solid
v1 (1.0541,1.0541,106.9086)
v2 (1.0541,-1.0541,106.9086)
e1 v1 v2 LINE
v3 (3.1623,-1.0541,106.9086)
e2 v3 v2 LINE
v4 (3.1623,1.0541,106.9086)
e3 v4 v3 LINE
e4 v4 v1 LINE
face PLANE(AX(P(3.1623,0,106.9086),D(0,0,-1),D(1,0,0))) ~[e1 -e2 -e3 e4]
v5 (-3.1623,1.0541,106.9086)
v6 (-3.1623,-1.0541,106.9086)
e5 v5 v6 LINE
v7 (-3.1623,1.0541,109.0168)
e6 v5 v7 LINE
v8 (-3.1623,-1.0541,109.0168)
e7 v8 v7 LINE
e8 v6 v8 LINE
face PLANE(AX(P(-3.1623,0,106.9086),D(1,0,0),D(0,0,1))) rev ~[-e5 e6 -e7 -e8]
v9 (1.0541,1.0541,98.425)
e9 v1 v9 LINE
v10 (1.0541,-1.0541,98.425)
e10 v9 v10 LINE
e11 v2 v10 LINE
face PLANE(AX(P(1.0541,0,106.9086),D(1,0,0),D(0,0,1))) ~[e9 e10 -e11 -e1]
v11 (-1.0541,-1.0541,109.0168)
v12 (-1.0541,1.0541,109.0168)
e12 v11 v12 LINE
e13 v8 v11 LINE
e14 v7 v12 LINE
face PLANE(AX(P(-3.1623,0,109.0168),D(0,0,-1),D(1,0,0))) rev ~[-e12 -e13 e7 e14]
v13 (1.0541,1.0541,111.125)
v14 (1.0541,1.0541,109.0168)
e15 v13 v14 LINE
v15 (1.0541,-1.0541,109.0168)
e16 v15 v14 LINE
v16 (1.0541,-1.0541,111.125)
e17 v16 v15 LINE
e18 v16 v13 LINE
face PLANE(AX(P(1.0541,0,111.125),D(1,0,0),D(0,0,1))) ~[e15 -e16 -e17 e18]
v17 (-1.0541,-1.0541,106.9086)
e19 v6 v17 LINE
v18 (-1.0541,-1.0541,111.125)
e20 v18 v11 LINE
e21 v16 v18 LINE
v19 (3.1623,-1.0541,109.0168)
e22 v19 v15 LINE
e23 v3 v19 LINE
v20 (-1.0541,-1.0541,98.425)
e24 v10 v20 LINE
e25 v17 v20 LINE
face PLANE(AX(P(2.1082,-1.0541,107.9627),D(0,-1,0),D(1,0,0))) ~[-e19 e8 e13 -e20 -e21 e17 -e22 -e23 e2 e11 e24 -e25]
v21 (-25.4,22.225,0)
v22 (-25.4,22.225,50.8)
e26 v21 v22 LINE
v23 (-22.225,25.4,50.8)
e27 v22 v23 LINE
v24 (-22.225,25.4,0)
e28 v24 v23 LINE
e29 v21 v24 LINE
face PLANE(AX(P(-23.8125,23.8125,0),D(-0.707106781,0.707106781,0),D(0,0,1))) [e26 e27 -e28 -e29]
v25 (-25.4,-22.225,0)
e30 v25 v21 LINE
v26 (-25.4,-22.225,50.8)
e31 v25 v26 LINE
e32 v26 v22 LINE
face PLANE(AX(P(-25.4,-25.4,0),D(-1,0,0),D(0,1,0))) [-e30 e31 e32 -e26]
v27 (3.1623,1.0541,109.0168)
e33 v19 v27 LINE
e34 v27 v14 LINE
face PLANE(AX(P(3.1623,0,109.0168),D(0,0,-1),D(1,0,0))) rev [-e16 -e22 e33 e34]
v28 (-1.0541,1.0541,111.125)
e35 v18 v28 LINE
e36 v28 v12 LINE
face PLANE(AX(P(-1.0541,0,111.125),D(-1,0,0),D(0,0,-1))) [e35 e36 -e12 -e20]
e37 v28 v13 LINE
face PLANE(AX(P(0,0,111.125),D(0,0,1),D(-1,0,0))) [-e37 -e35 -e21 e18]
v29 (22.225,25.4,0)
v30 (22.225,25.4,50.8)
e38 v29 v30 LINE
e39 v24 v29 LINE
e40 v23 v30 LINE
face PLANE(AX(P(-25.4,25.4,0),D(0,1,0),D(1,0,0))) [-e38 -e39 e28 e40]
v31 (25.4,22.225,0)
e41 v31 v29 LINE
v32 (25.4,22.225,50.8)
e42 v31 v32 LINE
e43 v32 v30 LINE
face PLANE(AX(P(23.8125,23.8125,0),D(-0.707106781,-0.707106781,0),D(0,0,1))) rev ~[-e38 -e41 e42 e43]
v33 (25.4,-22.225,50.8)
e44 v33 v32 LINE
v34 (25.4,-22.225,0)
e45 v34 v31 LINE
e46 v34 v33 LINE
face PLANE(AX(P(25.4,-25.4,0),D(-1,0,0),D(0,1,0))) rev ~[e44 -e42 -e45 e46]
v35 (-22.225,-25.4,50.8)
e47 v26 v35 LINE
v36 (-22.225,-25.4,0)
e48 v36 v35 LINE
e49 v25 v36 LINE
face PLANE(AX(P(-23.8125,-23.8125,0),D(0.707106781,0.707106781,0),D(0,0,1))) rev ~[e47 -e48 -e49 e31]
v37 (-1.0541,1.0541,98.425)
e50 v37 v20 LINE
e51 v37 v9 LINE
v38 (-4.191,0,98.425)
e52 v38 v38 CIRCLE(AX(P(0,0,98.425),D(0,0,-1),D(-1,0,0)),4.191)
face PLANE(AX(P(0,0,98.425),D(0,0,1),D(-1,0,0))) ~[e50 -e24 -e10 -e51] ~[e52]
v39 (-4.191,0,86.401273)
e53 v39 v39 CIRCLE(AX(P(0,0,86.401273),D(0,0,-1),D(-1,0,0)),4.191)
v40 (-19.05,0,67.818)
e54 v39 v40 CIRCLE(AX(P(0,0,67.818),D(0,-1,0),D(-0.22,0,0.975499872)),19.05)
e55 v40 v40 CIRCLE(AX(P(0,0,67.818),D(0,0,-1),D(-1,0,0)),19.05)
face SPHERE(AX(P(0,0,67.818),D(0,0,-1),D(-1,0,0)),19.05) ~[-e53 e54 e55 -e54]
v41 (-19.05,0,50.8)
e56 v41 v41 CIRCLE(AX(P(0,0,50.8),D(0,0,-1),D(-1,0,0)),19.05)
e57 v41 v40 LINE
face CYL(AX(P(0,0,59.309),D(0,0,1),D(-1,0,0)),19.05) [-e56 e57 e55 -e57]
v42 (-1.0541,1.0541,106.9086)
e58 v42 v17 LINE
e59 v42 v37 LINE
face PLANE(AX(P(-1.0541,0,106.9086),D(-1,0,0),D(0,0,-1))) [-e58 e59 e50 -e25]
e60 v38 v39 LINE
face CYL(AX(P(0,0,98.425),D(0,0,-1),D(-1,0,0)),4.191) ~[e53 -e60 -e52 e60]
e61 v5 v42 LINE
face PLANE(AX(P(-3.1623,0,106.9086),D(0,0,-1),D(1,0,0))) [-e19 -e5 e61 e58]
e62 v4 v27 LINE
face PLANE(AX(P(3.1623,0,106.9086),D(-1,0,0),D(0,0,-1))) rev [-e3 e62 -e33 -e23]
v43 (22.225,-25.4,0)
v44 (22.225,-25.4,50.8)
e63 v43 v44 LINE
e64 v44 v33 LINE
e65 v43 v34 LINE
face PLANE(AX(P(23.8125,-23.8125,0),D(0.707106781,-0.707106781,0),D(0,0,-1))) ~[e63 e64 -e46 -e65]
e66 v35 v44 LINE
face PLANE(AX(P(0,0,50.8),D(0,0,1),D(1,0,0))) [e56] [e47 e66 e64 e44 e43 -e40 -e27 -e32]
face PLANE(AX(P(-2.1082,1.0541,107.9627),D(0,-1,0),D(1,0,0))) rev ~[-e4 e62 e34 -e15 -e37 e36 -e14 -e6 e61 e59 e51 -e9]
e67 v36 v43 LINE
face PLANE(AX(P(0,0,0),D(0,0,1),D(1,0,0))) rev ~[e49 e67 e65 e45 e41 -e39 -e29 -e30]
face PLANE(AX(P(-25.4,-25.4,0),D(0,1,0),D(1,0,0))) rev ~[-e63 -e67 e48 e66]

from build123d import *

# Parameters (mm, degrees)
F0_W     = 50.8
F0_H     = 50.8
F1_DEPTH = 50.8
F2_SIZE  = 3.175
F3_W     = 19.05
F3_H     = 17.018
F5_W     = 2.1082
F5_H     = 2.1082
F6_DEPTH = 1.0541


with BuildPart() as f1:
    # F0 (on Top) → F1 (new body)
    with BuildSketch(Plane.XY):
        Rectangle(F0_W, F0_H)
    extrude(amount=F1_DEPTH)

    # F2
    f2_edges = [f1.edges().sort_by_distance(p)[0] for p in [
        (25.4, -25.4, 25.4),
        (25.4, 25.4, 25.4),
        (-25.4, 25.4, 25.4),
        (-25.4, -25.4, 25.4),
    ]]
    chamfer(f2_edges, length=F2_SIZE)

    # F3 (on Front) → F4 (revolve)
    with BuildSketch(Plane.XZ):
        with Locations((-9.525, 59.309)):
            Rectangle(F3_W, F3_H)
        with BuildLine():
            Line((-19.05, 67.818), (0, 67.818))
            Line((0, 67.818), (0, 86.4012725589))
            Line((0, 86.4012725589), (-4.191, 86.4012725589))
            ThreePointArc((-4.191, 86.4012725589), (-14.8785256326, 79.7147211869), (-19.05, 67.818))
        make_face()
        Polygon((-4.191, 86.4012725589), (0, 86.4012725589), (0, 86.868), (0, 98.425), (-4.191, 98.425), align=None)
    revolve(axis=Axis((0, 0, 59.309), (0, 0, 1)))

    # F5 (on Front) → F6 (join, symmetric)
    with BuildSketch(Plane.XZ):
        with Locations((-2.1082, 107.9627)):
            Rectangle(F5_W, F5_H)
        Polygon((-1.0541, 98.425), (0, 98.425), (0, 111.125), (-1.0541, 111.125), (-1.0541, 109.0168), (-1.0541, 106.9086), align=None)
    extrude(amount=F6_DEPTH, both=True)

    # F7: F1 across face


with BuildPart() as f1_1:
    add(f1.part)
    add(f1.part.mirror(Plane(origin=(0, 0, 104.775), x_dir=(0, 1, 0), z_dir=(1, 0, 0))))


solid = f1_1.part
